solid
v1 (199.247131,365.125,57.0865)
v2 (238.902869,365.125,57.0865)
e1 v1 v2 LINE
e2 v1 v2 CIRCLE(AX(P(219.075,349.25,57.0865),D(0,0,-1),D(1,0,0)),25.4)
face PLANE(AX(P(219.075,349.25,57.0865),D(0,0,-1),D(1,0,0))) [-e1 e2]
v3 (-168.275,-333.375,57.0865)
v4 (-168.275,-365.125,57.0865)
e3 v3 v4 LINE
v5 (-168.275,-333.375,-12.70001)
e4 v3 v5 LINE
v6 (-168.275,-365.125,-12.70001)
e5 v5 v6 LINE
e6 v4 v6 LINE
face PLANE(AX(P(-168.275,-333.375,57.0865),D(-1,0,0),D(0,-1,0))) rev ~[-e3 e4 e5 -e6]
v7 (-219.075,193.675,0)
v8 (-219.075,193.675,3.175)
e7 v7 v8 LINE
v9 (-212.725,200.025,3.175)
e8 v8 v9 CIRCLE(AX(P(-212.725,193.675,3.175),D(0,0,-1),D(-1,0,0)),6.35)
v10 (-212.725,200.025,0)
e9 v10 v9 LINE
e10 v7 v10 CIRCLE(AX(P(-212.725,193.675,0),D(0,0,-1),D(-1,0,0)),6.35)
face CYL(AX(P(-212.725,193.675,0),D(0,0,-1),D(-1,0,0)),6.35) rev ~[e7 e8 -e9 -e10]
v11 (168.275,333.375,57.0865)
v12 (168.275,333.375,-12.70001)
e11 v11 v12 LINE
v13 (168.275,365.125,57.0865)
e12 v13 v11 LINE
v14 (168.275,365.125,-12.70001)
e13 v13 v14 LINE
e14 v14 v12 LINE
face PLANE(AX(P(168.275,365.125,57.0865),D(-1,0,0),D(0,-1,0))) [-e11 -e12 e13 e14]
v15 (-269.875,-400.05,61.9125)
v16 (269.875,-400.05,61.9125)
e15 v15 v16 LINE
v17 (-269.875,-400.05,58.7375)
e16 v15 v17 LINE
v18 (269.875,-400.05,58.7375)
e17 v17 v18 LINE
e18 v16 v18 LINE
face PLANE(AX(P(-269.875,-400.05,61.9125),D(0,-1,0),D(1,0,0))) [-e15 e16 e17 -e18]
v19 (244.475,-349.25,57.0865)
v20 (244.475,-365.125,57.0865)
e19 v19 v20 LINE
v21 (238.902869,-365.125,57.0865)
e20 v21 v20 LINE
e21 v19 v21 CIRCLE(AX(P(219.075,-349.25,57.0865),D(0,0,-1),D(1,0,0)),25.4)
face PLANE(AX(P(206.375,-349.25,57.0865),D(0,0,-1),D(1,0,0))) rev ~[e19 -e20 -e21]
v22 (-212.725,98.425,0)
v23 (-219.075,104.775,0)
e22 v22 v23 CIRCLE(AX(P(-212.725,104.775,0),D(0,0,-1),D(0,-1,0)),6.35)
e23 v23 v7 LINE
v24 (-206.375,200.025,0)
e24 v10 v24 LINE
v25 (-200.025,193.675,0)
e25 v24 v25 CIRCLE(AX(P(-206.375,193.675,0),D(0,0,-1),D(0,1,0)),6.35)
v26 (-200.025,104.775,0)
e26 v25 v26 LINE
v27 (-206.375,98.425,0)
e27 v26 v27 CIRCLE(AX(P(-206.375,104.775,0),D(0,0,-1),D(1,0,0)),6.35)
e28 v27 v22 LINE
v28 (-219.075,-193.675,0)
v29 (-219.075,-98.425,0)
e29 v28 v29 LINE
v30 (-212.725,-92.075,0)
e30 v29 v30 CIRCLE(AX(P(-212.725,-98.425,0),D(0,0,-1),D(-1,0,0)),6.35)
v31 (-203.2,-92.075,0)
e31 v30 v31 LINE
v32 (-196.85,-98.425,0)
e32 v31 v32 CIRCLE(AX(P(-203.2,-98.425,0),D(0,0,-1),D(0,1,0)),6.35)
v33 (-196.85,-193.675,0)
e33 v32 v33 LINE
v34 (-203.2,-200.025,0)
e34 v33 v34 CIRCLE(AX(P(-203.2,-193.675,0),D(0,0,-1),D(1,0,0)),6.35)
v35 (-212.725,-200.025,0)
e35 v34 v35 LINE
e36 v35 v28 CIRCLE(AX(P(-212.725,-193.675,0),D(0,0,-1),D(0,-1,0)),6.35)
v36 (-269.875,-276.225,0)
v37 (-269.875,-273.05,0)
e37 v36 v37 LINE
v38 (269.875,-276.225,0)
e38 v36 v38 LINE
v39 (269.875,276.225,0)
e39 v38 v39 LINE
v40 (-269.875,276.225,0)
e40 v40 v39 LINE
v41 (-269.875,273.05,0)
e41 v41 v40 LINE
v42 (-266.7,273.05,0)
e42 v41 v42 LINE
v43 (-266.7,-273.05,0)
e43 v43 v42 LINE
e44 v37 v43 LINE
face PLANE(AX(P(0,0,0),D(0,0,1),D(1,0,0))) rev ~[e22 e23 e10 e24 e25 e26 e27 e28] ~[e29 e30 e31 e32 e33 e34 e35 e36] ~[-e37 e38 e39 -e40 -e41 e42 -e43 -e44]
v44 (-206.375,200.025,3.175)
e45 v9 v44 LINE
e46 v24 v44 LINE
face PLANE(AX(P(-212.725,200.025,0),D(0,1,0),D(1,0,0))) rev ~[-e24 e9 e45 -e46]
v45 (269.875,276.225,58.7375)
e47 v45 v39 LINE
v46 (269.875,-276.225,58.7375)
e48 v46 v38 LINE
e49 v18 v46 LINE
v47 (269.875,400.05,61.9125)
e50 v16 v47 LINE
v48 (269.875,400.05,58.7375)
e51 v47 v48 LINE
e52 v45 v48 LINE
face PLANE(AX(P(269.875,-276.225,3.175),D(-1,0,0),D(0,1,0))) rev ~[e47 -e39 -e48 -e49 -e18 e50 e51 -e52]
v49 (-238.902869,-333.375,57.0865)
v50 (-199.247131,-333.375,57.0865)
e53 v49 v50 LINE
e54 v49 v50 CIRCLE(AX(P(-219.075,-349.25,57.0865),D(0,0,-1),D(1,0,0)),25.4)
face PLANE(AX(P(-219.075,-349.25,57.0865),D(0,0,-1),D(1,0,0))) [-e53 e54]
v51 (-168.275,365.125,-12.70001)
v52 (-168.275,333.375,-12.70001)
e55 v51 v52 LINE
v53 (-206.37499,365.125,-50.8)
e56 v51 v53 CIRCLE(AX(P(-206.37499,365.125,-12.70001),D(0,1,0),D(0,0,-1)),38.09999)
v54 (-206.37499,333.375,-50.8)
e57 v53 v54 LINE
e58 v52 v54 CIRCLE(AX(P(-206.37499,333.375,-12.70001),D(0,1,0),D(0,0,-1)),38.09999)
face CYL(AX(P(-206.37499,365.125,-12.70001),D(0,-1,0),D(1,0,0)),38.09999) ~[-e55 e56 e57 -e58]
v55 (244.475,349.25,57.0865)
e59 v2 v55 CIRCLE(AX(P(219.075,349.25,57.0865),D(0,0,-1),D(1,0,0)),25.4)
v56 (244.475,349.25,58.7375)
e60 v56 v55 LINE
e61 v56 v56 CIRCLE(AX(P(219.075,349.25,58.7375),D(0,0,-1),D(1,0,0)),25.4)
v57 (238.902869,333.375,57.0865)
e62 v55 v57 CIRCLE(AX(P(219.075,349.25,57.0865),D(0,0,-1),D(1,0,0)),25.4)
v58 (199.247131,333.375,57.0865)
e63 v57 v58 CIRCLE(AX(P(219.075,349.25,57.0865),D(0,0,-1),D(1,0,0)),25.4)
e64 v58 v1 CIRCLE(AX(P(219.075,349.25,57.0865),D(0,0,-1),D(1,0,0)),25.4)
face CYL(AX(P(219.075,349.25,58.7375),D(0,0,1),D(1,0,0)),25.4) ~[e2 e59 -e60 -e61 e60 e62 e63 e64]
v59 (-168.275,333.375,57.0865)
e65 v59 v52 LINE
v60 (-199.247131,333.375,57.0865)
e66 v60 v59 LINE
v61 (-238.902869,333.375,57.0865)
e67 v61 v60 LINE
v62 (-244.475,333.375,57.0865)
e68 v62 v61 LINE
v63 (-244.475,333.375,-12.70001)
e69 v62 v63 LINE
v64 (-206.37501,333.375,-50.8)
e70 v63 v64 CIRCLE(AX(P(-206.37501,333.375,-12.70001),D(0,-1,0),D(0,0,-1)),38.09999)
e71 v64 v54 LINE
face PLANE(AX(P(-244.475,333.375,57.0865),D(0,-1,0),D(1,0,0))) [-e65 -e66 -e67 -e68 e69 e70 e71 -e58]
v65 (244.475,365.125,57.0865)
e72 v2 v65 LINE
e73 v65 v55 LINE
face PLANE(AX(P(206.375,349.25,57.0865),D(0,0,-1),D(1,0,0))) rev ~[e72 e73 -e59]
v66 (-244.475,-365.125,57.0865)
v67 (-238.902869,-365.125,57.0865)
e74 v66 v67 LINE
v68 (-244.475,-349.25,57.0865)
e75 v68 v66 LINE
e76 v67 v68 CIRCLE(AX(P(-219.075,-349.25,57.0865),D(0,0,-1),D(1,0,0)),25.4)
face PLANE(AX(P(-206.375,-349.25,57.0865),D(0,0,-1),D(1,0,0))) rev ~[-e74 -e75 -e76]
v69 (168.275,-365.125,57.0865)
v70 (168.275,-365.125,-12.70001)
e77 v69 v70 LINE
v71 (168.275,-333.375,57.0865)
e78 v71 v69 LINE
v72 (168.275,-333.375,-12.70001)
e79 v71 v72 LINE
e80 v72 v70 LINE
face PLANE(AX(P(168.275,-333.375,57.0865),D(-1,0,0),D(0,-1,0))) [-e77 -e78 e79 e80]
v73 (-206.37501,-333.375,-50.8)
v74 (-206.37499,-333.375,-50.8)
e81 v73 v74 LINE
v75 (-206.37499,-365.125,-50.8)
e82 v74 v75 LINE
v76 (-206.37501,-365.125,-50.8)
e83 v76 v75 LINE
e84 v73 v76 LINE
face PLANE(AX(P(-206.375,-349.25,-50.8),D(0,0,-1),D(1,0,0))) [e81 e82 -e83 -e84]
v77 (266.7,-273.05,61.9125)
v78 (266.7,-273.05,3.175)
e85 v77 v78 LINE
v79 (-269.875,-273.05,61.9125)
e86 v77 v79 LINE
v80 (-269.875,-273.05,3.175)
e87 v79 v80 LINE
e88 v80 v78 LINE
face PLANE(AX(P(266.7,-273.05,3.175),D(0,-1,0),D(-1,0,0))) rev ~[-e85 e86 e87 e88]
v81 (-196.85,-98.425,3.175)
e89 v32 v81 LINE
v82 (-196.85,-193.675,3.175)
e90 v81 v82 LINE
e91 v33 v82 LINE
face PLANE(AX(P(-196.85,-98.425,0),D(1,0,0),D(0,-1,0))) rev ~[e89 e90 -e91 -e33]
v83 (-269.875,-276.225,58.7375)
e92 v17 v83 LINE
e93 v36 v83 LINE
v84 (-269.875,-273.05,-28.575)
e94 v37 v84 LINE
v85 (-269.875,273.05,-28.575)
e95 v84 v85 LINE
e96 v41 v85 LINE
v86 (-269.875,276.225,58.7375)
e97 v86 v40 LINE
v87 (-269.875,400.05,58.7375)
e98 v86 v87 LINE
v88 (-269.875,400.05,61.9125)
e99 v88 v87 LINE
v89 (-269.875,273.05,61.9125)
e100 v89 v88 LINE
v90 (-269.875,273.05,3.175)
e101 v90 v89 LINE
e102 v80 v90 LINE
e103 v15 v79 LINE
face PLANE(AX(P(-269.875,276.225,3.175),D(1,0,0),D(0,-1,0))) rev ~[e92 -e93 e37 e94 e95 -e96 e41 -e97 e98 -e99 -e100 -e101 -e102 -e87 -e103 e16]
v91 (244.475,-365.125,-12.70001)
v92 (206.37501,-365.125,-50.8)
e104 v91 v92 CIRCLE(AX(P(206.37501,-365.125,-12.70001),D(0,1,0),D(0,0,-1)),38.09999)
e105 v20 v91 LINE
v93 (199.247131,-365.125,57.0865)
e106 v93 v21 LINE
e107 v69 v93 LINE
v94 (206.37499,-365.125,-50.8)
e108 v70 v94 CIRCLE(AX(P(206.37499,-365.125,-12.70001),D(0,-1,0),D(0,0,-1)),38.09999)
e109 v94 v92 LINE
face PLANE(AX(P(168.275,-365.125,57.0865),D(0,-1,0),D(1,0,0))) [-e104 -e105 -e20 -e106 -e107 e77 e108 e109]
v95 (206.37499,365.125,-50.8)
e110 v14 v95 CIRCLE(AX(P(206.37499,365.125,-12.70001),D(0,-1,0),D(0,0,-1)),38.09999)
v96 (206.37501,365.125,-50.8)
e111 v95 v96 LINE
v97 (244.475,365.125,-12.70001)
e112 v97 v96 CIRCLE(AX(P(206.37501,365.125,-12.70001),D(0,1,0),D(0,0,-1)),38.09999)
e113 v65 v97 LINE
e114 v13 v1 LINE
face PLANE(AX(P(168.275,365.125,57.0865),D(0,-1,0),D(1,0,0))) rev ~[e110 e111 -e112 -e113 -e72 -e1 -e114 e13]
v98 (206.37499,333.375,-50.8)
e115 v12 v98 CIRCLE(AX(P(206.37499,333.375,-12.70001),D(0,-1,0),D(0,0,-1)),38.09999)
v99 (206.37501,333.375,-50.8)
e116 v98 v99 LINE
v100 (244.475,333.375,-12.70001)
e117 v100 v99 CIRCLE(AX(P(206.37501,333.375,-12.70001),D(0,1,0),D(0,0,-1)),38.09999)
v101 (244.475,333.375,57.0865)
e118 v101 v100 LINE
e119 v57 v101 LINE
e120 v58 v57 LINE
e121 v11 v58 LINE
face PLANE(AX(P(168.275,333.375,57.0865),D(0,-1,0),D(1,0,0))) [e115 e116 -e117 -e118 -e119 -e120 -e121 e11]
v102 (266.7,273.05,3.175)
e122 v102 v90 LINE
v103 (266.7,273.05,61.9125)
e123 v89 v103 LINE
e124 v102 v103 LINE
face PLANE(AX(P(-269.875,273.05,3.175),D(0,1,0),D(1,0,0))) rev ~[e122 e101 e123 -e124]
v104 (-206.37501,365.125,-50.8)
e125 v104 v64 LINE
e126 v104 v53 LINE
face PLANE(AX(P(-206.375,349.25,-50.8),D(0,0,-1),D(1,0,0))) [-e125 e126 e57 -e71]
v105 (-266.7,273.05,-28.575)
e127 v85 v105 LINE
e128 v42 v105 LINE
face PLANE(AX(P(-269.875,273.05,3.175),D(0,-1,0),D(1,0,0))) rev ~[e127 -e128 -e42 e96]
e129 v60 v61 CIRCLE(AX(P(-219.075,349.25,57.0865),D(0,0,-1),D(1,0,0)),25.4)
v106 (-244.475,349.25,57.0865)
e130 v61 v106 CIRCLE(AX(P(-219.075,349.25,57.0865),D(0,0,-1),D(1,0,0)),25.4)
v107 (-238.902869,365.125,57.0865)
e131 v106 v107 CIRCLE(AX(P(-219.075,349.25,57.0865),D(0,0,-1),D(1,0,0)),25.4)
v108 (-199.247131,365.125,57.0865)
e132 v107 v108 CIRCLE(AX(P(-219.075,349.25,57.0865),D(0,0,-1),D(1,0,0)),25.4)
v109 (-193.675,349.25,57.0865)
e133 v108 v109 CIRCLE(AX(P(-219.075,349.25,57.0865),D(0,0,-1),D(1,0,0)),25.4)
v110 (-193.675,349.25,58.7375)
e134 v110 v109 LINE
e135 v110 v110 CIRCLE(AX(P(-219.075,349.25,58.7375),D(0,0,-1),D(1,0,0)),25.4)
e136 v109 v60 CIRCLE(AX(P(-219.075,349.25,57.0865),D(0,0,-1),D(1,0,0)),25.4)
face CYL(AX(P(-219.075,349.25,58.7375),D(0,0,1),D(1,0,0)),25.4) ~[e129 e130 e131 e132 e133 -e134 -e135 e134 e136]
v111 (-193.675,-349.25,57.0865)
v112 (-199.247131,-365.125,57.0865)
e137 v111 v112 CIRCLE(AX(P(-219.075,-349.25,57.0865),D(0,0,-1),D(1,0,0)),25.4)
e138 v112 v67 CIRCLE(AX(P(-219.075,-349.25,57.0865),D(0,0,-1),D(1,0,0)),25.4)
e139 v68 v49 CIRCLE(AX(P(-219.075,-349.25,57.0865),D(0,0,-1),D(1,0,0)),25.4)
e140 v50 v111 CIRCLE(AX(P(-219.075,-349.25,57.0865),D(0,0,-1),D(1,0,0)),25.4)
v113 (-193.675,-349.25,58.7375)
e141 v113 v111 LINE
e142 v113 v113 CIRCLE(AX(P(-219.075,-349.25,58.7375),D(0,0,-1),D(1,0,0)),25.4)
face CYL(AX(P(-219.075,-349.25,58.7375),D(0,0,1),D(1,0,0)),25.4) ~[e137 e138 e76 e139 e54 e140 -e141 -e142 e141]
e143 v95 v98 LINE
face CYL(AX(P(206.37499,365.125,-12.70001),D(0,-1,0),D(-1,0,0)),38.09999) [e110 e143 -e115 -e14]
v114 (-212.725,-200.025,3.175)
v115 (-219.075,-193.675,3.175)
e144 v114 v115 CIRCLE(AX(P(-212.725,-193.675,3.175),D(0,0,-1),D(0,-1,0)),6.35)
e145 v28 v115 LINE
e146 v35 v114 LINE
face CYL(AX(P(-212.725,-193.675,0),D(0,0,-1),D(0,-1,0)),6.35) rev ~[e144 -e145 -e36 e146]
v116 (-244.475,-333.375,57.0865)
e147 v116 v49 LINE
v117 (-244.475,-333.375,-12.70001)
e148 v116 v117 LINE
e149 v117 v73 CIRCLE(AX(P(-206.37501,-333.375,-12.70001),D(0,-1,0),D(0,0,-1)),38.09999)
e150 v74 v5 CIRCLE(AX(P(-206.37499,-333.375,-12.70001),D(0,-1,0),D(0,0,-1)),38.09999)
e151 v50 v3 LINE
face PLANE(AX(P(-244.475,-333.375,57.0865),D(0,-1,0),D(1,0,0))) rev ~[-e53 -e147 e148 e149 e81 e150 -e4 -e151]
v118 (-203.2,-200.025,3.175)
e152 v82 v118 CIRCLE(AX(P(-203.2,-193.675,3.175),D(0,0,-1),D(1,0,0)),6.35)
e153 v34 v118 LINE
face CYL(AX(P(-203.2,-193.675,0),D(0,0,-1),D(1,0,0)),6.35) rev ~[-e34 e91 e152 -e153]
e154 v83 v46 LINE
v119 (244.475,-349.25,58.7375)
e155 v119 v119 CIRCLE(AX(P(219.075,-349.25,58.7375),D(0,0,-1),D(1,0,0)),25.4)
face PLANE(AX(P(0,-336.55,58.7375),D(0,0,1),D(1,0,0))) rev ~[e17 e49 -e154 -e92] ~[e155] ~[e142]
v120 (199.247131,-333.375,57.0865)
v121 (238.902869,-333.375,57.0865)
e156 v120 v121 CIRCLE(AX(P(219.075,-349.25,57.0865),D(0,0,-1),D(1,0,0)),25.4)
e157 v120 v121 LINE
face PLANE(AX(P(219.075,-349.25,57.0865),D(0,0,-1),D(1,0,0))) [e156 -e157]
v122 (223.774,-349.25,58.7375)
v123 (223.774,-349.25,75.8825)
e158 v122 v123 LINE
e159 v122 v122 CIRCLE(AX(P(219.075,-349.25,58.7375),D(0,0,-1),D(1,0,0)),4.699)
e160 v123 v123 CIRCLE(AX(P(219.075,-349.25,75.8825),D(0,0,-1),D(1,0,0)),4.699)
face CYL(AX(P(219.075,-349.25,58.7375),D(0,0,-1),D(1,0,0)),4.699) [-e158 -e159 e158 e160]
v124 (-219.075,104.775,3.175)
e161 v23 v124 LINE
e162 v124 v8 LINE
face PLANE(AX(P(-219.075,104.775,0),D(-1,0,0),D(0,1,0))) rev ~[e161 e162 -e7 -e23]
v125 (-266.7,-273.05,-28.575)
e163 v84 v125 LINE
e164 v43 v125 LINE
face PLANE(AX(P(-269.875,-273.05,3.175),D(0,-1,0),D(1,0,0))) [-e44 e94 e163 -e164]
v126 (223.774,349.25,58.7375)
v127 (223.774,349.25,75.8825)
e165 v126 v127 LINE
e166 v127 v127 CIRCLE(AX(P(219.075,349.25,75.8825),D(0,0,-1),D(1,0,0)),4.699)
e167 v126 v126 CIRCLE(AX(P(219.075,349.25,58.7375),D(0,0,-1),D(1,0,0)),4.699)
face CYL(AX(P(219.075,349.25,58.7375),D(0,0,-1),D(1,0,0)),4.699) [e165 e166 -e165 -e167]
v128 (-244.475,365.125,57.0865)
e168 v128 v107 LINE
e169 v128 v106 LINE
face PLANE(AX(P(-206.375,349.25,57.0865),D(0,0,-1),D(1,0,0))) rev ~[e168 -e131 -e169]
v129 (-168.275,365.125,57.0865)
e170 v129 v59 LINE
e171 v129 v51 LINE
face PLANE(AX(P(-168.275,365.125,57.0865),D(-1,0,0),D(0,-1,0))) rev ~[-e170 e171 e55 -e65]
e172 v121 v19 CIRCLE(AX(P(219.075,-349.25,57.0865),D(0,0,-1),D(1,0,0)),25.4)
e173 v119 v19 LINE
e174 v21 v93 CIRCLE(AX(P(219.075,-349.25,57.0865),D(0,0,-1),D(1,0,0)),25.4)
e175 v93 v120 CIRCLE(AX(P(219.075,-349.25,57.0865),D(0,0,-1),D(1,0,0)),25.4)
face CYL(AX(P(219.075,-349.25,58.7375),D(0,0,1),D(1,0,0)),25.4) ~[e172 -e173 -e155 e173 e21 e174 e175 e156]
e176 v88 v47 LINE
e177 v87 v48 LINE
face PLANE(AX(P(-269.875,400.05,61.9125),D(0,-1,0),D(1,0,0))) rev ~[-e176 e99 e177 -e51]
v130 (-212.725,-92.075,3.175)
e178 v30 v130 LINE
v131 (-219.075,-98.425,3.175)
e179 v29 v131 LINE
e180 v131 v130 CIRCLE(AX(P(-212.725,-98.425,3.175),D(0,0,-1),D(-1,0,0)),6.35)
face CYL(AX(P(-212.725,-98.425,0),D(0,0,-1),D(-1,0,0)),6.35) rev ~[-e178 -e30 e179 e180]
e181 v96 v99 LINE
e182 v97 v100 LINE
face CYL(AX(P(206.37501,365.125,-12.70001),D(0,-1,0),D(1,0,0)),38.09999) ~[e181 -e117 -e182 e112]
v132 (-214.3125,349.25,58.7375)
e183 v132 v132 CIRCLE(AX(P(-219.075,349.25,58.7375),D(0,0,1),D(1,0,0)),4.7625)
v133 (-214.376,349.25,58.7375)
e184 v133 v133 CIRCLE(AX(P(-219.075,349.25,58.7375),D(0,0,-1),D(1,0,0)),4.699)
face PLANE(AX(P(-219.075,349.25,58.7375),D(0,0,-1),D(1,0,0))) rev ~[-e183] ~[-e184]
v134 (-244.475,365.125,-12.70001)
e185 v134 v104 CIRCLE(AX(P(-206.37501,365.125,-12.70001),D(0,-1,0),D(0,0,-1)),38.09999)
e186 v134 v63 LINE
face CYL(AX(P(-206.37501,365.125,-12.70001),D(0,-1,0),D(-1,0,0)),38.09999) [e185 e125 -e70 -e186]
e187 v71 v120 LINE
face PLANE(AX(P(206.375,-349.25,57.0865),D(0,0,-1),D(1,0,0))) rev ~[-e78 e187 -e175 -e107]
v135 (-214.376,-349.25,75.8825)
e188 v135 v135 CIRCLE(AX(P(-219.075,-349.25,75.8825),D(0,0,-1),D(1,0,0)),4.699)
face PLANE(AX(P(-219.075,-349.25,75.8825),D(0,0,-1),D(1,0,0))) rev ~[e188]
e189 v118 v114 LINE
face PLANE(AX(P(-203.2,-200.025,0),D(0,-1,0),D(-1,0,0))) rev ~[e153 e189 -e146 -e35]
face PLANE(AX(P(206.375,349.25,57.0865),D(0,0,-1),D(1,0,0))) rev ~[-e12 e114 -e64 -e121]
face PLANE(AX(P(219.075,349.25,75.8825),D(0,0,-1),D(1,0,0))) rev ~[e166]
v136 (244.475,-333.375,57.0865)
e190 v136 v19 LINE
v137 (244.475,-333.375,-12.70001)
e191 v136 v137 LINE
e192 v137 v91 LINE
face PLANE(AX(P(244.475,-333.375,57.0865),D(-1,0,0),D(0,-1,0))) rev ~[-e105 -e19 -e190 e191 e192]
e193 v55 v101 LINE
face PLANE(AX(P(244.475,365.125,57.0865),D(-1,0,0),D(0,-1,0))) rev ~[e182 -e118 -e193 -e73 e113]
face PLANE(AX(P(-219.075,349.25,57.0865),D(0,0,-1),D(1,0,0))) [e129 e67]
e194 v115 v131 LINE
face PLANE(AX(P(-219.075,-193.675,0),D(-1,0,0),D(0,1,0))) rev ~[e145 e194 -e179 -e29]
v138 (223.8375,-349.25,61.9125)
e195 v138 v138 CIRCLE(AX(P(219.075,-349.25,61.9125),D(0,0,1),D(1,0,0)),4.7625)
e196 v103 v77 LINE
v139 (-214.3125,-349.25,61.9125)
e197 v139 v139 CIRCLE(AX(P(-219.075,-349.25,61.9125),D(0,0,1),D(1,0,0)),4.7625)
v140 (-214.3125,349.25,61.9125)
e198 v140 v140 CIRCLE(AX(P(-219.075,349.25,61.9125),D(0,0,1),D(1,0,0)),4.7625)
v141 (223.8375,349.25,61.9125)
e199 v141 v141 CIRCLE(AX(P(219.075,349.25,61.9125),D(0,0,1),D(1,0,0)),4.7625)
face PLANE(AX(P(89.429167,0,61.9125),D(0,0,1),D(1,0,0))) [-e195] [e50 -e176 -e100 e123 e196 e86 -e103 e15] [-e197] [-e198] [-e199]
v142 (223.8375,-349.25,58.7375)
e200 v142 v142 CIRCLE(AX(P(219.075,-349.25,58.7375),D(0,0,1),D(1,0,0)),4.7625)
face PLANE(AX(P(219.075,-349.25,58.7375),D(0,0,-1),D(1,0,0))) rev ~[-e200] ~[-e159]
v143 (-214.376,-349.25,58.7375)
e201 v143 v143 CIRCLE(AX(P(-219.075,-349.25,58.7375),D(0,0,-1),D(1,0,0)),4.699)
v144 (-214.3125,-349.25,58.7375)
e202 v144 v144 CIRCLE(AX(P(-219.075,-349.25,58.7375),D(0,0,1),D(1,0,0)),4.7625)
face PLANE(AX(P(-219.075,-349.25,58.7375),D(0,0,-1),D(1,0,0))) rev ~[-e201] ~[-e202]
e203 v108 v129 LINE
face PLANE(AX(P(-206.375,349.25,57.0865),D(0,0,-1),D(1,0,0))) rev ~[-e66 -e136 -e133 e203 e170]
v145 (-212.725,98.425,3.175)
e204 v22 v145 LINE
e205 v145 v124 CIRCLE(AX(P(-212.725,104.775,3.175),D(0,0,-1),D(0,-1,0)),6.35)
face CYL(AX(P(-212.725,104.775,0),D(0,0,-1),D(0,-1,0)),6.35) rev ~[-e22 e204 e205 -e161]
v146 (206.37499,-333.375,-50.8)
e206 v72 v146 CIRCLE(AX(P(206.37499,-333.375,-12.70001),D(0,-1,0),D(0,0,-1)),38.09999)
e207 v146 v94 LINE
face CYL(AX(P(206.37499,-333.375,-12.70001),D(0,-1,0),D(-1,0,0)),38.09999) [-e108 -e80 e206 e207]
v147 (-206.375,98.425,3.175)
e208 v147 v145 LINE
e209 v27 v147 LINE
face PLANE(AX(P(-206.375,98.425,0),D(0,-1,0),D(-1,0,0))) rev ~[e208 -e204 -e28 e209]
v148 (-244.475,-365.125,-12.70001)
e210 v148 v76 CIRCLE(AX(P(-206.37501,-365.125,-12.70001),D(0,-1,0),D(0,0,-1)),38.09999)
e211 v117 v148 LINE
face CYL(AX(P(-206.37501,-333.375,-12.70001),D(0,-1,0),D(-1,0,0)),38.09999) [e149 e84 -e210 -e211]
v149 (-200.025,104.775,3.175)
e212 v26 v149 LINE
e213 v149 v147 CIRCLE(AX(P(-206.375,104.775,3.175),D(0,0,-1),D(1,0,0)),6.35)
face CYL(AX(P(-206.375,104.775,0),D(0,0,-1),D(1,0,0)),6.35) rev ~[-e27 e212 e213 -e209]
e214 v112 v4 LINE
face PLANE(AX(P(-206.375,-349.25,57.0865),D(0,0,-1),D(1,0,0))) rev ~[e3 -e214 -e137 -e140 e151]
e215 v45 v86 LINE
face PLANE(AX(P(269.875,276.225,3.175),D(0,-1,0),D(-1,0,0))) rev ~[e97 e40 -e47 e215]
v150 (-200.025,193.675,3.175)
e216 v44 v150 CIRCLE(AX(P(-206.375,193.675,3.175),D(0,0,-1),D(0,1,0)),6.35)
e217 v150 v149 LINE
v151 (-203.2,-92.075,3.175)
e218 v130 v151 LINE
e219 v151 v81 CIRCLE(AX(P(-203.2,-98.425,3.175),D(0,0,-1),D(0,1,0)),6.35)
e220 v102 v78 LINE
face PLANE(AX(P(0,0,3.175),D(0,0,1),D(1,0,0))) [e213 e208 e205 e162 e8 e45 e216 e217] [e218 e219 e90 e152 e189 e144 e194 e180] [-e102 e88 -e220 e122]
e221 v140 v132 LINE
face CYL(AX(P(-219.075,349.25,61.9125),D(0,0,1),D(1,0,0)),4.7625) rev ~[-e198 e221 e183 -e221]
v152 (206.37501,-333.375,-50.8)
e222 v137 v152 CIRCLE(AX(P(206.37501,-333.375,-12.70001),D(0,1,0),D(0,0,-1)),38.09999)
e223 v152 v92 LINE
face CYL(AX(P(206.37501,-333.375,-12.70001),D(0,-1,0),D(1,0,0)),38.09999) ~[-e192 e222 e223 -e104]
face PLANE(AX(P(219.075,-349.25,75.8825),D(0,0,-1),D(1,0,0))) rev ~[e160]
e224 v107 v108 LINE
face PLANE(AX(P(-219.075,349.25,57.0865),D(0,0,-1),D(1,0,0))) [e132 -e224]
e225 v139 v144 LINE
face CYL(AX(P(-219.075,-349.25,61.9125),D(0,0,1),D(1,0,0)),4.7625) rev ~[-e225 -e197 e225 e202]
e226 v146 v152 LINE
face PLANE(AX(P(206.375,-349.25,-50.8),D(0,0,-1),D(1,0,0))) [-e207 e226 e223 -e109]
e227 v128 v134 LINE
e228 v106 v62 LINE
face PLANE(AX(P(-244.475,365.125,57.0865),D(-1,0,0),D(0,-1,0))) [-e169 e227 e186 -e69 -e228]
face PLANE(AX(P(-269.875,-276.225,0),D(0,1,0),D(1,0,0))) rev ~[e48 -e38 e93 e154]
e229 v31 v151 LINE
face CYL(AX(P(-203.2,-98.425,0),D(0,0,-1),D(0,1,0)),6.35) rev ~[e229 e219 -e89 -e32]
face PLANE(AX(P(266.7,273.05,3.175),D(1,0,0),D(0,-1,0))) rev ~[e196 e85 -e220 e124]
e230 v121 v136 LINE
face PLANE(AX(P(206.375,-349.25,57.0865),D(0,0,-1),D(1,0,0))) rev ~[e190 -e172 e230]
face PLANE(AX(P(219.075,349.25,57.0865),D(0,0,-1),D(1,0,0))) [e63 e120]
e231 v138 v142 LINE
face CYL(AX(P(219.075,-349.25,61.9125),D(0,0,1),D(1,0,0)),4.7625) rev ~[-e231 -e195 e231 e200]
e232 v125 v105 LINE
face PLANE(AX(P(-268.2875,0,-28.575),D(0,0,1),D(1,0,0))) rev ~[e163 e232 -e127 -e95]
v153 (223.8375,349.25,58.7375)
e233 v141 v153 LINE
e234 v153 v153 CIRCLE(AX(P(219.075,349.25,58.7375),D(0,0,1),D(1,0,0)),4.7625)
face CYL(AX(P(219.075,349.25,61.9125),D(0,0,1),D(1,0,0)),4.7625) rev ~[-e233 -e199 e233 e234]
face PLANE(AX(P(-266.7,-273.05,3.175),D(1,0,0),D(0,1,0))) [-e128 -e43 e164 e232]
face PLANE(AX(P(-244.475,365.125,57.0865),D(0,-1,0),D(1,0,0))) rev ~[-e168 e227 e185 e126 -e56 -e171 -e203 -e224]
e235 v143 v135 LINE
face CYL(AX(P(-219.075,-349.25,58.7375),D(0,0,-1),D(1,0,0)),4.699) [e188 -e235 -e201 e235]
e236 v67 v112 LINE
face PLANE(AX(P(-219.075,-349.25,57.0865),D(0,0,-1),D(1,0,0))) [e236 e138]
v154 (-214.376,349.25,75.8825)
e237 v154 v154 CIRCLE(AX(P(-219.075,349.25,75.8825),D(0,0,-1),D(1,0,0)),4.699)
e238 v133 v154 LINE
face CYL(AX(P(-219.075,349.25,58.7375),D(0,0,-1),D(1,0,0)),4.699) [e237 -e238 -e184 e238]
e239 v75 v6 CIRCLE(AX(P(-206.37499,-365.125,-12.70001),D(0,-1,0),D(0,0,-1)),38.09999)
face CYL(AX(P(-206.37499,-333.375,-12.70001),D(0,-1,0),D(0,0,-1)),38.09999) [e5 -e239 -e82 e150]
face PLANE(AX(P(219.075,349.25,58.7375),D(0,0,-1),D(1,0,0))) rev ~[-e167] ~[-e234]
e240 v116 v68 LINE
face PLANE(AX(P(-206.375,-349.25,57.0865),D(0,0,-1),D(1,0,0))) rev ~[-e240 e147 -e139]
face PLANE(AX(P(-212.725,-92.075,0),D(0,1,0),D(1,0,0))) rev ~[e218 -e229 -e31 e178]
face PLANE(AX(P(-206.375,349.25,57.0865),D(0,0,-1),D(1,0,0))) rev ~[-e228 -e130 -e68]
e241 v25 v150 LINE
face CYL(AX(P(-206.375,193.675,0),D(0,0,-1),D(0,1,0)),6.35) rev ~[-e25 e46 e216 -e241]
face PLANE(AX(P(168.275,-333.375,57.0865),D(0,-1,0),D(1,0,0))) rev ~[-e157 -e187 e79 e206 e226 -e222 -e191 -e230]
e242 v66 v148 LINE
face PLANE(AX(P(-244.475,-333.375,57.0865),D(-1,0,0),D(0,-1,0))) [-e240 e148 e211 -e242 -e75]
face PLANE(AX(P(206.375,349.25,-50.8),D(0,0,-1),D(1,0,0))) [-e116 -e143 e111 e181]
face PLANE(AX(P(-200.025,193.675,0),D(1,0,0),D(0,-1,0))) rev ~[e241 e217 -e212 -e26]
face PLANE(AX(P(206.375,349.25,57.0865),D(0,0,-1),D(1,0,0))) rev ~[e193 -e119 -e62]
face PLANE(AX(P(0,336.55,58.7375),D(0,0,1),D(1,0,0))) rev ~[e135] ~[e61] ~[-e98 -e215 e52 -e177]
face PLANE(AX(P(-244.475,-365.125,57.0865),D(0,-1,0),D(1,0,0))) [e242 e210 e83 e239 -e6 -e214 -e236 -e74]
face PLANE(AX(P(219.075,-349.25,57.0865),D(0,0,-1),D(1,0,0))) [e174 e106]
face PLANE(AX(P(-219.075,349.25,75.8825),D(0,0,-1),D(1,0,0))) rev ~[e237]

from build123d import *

# Parameters (mm, degrees)
F0_W      = 539.75
F0_H      = 552.45
F1_DEPTH  = 3.175
F3_DEPTH  = 58.7375
F4_W      = 539.75
F4_H      = 127
F4_R      = 4.7625
F5_DEPTH  = 3.175
F6_R      = 4.699
F7_DEPTH  = 17.145
F8_R      = 25.4
F9_DEPTH  = 1.651
F10_W     = 76.2
F10_H     = 31.75
F11_DEPTH = 107.8865
F12_R     = 38.09999
F13_W     = 3.175
F13_H     = 546.1
F14_DEPTH = 31.75


# Not quite as in the source:
# - a fillet or chamfer is up to 0.001 mm smaller than in the source, because OpenCascade refuses the exact size


with BuildPart() as f1:
    # F0 (on Top) → F1 (new body)
    with BuildSketch(Plane.XY):
        Rectangle(F0_W, F0_H)
        with BuildLine():
            ThreePointArc((-219.075, -98.425), (-217.2151280605, -93.9348719395), (-212.725, -92.075))
            Line((-212.725, -92.075), (-203.2, -92.075))
            ThreePointArc((-203.2, -92.075), (-198.7098719395, -93.9348719395), (-196.85, -98.425))
            Line((-196.85, -98.425), (-196.85, -193.675))
            ThreePointArc((-196.85, -193.675), (-198.7098719395, -198.1651280605), (-203.2, -200.025))
            Line((-203.2, -200.025), (-212.725, -200.025))
            ThreePointArc((-212.725, -200.025), (-217.2151280605, -198.1651280605), (-219.075, -193.675))
            Line((-219.075, -193.675), (-219.075, -98.425))
        make_face(mode=Mode.SUBTRACT)
        with BuildLine():
            ThreePointArc((-219.075, 193.675), (-217.2151280605, 198.1651280605), (-212.725, 200.025))
            Line((-212.725, 200.025), (-206.375, 200.025))
            ThreePointArc((-206.375, 200.025), (-201.8848719395, 198.1651280605), (-200.025, 193.675))
            Line((-200.025, 193.675), (-200.025, 104.775))
            ThreePointArc((-200.025, 104.775), (-201.8848719395, 100.2848719395), (-206.375, 98.425))
            Line((-206.375, 98.425), (-212.725, 98.425))
            ThreePointArc((-212.725, 98.425), (-217.2151280605, 100.2848719395), (-219.075, 104.775))
            Line((-219.075, 104.775), (-219.075, 193.675))
        make_face(mode=Mode.SUBTRACT)
    extrude(amount=F1_DEPTH)

    # F2 (on face) → F3 (join)
    with BuildSketch(Plane.XY.offset(3.175)):
        Polygon((-269.875, 276.225), (-269.875, 273.05), (266.7, 273.05), (266.7, -273.05), (-269.875, -273.05), (-269.875, -276.225), (269.875, -276.225), (269.875, 276.225), align=None)
    extrude(amount=F3_DEPTH)

    # F4 (on face) → F5 (join)
    with BuildSketch(Plane.XY.offset(61.9125)):
        with Locations((0, 336.55)):
            Rectangle(F4_W, F4_H)
        with Locations((-219.075, 349.25)):
            Circle(F4_R, mode=Mode.SUBTRACT)
        with Locations((219.075, 349.25)):
            Circle(F4_R, mode=Mode.SUBTRACT)
        with Locations((0, -336.55)):
            Rectangle(F4_W, F4_H)
        with Locations((-219.075, -349.25)):
            Circle(F4_R, mode=Mode.SUBTRACT)
        with Locations((219.075, -349.25)):
            Circle(F4_R, mode=Mode.SUBTRACT)
    extrude(amount=-F5_DEPTH)



with BuildPart() as f7:
    # F6 (on face) → F7 (new body)
    with BuildSketch(Plane(origin=(0, 0, 58.7375), x_dir=(1, 0, 0), z_dir=(0, 0, -1))):
        with Locations((-219.075, 349.25)):
            Circle(F6_R)
    extrude(amount=-F7_DEPTH)


with BuildPart() as f7b:
    # F6 (on face) → F7, piece 2 (new body)
    with BuildSketch(Plane(origin=(0, 0, 58.7375), x_dir=(1, 0, 0), z_dir=(0, 0, -1))):
        with Locations((219.075, 349.25)):
            Circle(F6_R)
    extrude(amount=-F7_DEPTH)


with BuildPart() as f7c:
    # F6 (on face) → F7, piece 3 (new body)
    with BuildSketch(Plane(origin=(0, 0, 58.7375), x_dir=(1, 0, 0), z_dir=(0, 0, -1))):
        with Locations((-219.075, -349.25)):
            Circle(F6_R)
    extrude(amount=-F7_DEPTH)


with BuildPart() as f7d:
    # F6 (on face) → F7, piece 4 (new body)
    with BuildSketch(Plane(origin=(0, 0, 58.7375), x_dir=(1, 0, 0), z_dir=(0, 0, -1))):
        with Locations((219.075, -349.25)):
            Circle(F6_R)
    extrude(amount=-F7_DEPTH)


with BuildPart() as f1_1:
    add(f1.part)

    add(f7.part)  # F9 merges F7

    add(f7b.part)  # F9 merges F7b

    add(f7c.part)  # F9 merges F7c

    add(f7d.part)  # F9 merges F7d
    # F8 (on face) → F9 (join)
    with BuildSketch(Plane(origin=(0, 0, 58.7375), x_dir=(1, 0, 0), z_dir=(0, 0, -1))):
        with Locations((-219.075, 349.25)):
            Circle(F8_R)
        with Locations((219.075, 349.25)):
            Circle(F8_R)
        with Locations((-219.075, -349.25)):
            Circle(F8_R)
        with Locations((219.075, -349.25)):
            Circle(F8_R)
    extrude(amount=F9_DEPTH)

    # F10 (on face) → F11 (join)
    with BuildSketch(Plane(origin=(0, 0, 57.0865), x_dir=(1, 0, 0), z_dir=(0, 0, -1))):
        with Locations((-206.375, 349.25)):
            Rectangle(F10_W, F10_H)
        with Locations((206.375, 349.25)):
            Rectangle(F10_W, F10_H)
        with Locations((-206.375, -349.25)):
            Rectangle(F10_W, F10_H)
        with Locations((206.375, -349.25)):
            Rectangle(F10_W, F10_H)
    extrude(amount=F11_DEPTH)

    # F12 (radius 38.1 in the source; OpenCascade refuses exactly that, so slightly less here)
    f12_edges = [f1_1.edges().sort_by_distance(p)[0] for p in [
        (-168.275, -349.25, -50.8),
        (-244.475, -349.25, -50.8),
        (168.275, -349.25, -50.8),
        (244.475, -349.25, -50.8),
        (-244.475, 349.25, -50.8),
        (-168.275, 349.25, -50.8),
        (168.275, 349.25, -50.8),
        (244.475, 349.25, -50.8),
    ]]
    fillet(f12_edges, radius=F12_R)

    # F13 (on face) → F14 (join)
    with BuildSketch(Plane.XY.offset(3.175)):
        with Locations((-268.2875, 0)):
            Rectangle(F13_W, F13_H)
    extrude(amount=-F14_DEPTH)


solid = f1_1.part
